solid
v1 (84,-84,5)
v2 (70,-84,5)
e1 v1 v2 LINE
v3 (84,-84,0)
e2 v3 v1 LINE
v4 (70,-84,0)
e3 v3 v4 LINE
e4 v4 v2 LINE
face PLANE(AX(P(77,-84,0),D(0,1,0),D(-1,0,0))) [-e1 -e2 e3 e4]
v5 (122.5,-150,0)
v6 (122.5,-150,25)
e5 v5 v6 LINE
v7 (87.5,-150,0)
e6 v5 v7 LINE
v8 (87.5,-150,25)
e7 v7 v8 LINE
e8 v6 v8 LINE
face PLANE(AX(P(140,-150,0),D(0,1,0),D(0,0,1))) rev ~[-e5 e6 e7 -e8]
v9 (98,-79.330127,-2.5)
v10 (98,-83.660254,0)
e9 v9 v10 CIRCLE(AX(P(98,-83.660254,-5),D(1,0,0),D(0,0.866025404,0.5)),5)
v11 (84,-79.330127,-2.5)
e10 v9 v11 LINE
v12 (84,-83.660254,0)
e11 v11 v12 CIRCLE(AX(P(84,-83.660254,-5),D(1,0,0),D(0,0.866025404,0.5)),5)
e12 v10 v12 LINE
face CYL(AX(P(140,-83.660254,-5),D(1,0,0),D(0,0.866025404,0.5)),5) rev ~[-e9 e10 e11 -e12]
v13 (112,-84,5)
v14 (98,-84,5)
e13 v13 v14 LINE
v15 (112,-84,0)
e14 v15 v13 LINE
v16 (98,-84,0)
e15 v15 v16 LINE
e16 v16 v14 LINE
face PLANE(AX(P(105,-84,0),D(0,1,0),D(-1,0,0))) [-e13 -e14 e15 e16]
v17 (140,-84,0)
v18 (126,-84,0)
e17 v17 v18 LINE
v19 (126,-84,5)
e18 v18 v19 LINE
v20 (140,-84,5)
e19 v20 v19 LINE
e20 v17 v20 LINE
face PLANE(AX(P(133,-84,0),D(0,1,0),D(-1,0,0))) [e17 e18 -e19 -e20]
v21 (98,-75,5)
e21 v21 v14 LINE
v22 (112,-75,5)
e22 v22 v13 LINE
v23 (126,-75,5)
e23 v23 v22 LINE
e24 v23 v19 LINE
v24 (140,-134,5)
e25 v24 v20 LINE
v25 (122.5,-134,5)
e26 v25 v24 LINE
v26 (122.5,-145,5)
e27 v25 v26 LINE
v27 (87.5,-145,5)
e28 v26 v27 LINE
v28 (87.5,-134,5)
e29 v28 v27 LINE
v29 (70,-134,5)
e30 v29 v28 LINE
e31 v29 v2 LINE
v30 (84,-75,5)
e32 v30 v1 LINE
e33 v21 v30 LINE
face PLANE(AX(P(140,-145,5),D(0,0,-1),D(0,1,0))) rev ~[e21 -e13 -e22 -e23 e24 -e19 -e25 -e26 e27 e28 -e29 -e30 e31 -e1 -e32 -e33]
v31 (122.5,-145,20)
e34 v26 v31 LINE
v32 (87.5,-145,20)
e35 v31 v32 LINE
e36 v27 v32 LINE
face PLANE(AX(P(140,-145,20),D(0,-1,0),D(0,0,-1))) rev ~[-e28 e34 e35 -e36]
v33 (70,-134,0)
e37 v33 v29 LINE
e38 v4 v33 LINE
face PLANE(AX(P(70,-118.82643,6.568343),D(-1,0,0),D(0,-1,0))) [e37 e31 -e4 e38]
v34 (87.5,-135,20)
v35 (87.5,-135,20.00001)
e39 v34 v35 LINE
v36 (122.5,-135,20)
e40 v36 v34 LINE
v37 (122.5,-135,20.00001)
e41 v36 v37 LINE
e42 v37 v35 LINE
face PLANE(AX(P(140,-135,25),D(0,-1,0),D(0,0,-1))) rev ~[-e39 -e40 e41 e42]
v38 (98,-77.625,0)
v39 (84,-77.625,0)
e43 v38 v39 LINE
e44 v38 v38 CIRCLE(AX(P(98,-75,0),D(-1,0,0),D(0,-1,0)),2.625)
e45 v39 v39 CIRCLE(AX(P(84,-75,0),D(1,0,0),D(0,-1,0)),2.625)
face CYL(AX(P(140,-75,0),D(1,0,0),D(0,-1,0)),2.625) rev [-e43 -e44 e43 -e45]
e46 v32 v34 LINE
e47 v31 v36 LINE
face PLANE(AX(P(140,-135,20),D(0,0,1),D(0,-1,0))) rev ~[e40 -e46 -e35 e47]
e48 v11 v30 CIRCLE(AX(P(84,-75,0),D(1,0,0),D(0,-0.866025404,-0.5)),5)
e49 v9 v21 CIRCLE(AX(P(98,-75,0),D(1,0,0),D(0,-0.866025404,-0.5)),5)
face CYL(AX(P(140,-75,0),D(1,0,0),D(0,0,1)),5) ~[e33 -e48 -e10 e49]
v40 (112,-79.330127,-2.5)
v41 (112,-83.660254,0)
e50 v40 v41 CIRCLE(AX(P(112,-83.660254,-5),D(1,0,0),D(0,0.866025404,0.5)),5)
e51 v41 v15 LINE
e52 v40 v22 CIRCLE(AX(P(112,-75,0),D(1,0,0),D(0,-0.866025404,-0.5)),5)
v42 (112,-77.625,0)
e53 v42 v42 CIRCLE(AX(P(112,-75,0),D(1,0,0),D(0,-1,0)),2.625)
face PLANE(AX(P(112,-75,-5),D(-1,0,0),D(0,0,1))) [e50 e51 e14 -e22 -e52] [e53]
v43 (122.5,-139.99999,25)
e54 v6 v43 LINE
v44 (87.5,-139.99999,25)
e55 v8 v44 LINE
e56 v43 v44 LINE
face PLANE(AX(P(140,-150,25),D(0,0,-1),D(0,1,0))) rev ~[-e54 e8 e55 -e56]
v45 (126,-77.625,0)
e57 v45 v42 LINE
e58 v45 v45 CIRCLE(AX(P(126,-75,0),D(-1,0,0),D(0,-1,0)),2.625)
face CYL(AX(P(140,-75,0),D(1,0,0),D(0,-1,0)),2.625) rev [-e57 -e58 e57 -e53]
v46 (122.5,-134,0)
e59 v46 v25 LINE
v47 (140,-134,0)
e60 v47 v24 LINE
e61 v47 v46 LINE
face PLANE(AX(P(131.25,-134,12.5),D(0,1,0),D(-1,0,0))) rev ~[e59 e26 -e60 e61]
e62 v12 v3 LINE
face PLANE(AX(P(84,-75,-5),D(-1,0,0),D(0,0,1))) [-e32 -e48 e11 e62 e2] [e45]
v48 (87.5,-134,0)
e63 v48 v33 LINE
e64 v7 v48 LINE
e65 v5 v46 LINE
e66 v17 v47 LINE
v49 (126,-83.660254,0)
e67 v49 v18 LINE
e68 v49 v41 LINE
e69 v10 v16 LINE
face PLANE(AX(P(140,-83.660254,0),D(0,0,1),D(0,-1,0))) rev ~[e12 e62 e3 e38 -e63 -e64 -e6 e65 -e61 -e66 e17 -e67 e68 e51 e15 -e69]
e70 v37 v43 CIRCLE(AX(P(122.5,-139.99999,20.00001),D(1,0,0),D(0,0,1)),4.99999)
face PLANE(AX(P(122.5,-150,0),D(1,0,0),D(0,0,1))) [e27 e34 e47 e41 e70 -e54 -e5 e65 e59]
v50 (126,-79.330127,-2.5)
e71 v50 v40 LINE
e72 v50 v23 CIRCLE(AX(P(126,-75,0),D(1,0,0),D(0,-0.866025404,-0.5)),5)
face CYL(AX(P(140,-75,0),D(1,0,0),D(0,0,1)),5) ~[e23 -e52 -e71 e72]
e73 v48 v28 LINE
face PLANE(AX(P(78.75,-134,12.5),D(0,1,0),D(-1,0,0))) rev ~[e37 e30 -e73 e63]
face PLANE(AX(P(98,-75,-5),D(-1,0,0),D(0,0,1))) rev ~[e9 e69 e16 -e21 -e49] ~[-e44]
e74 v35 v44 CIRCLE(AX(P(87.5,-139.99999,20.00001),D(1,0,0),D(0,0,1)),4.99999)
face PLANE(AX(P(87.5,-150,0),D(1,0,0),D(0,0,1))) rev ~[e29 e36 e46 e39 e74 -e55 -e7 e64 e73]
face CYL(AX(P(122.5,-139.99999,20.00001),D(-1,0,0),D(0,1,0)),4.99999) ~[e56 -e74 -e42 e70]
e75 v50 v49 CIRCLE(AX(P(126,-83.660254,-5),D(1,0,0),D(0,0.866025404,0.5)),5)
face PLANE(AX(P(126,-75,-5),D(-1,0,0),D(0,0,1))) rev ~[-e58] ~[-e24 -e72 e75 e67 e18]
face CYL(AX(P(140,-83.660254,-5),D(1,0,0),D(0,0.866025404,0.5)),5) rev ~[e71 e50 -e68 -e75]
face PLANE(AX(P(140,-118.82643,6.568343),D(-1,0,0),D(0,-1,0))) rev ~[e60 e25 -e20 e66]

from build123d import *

# Parameters (mm, degrees)
F0_R          = 2.625
F1_DEPTH      = 70
F2_W          = 17.5
F2_H          = 25
F3_DEPTH      = 16
F5_W          = 14
F5_H          = 10
F6_DEPTH      = 9
F6_DEPTH_BACK = 5.001
F7_R          = 4.99999
F8_ANGLE      = 180
F9_ANGLE      = 180


# Not quite as in the source:
# - a fillet or chamfer is up to 0.001 mm smaller than in the source, because OpenCascade refuses the exact size


with BuildPart() as f1:
    # F0 (on Right) → F1 (new body)
    with BuildSketch(Plane.YZ):
        with BuildLine():
            Line((-5, 5), (-20.3439258039, 5))
            Line((-20.3439258039, 5), (-75, 5))
            ThreePointArc((-75, 5), (-79.3301270189, -2.5), (-70.6698729811, -2.5))
            ThreePointArc((-70.6698729811, -2.5), (-68.8397459622, -0.6698729811), (-66.3397459622, 0))
            Line((-66.3397459622, 0), (0, 0))
            Line((0, 0), (0, 5))
            Line((0, 5), (0, 25))
            Line((0, 25), (-15, 25))
            Line((-15, 25), (-15, 20))
            Line((-15, 20), (-5, 20))
            Line((-5, 20), (-5, 5))
        make_face()
        with Locations((-75, 0)):
            Circle(F0_R, mode=Mode.SUBTRACT)
    extrude(amount=F1_DEPTH)

    # F2 (on Front) → F3 (cut)
    with BuildSketch(Plane.XZ):
        with Locations((8.75, 12.5)):
            Rectangle(F2_W, F2_H)
        with Locations((61.25, 12.5)):
            Rectangle(F2_W, F2_H)
    extrude(amount=F3_DEPTH, mode=Mode.SUBTRACT)

    # F5 (on offset) → F6 (cut, two sides)
    with BuildSketch(Plane.XZ.offset(75)) as f6_sk:
        with Locations((7, 0)):
            Rectangle(F5_W, F5_H)
        with Locations((35, 0)):
            Rectangle(F5_W, F5_H)
        with Locations((63, 0)):
            Rectangle(F5_W, F5_H)
    extrude(amount=-F6_DEPTH, mode=Mode.SUBTRACT)
    extrude(f6_sk.sketch, amount=F6_DEPTH_BACK, mode=Mode.SUBTRACT)

    # F7 (radius 5 in the source; OpenCascade refuses exactly that, so slightly less here)
    f7_edges = [f1.edges().sort_by_distance(p)[0] for p in [
        (35, -15, 25),
    ]]
    fillet(f7_edges, radius=F7_R)


with BuildPart() as f1_1:
    # F8: moved
    add(f1.part.rotate(Axis((56, -75, 0), (-1, 0, 0)), F8_ANGLE))


with BuildPart() as f1_2:
    # F9: moved
    add(f1_1.part.rotate(Axis((70, -109, 0), (0, -1, 0)), F9_ANGLE))


solid = f1_2.part
